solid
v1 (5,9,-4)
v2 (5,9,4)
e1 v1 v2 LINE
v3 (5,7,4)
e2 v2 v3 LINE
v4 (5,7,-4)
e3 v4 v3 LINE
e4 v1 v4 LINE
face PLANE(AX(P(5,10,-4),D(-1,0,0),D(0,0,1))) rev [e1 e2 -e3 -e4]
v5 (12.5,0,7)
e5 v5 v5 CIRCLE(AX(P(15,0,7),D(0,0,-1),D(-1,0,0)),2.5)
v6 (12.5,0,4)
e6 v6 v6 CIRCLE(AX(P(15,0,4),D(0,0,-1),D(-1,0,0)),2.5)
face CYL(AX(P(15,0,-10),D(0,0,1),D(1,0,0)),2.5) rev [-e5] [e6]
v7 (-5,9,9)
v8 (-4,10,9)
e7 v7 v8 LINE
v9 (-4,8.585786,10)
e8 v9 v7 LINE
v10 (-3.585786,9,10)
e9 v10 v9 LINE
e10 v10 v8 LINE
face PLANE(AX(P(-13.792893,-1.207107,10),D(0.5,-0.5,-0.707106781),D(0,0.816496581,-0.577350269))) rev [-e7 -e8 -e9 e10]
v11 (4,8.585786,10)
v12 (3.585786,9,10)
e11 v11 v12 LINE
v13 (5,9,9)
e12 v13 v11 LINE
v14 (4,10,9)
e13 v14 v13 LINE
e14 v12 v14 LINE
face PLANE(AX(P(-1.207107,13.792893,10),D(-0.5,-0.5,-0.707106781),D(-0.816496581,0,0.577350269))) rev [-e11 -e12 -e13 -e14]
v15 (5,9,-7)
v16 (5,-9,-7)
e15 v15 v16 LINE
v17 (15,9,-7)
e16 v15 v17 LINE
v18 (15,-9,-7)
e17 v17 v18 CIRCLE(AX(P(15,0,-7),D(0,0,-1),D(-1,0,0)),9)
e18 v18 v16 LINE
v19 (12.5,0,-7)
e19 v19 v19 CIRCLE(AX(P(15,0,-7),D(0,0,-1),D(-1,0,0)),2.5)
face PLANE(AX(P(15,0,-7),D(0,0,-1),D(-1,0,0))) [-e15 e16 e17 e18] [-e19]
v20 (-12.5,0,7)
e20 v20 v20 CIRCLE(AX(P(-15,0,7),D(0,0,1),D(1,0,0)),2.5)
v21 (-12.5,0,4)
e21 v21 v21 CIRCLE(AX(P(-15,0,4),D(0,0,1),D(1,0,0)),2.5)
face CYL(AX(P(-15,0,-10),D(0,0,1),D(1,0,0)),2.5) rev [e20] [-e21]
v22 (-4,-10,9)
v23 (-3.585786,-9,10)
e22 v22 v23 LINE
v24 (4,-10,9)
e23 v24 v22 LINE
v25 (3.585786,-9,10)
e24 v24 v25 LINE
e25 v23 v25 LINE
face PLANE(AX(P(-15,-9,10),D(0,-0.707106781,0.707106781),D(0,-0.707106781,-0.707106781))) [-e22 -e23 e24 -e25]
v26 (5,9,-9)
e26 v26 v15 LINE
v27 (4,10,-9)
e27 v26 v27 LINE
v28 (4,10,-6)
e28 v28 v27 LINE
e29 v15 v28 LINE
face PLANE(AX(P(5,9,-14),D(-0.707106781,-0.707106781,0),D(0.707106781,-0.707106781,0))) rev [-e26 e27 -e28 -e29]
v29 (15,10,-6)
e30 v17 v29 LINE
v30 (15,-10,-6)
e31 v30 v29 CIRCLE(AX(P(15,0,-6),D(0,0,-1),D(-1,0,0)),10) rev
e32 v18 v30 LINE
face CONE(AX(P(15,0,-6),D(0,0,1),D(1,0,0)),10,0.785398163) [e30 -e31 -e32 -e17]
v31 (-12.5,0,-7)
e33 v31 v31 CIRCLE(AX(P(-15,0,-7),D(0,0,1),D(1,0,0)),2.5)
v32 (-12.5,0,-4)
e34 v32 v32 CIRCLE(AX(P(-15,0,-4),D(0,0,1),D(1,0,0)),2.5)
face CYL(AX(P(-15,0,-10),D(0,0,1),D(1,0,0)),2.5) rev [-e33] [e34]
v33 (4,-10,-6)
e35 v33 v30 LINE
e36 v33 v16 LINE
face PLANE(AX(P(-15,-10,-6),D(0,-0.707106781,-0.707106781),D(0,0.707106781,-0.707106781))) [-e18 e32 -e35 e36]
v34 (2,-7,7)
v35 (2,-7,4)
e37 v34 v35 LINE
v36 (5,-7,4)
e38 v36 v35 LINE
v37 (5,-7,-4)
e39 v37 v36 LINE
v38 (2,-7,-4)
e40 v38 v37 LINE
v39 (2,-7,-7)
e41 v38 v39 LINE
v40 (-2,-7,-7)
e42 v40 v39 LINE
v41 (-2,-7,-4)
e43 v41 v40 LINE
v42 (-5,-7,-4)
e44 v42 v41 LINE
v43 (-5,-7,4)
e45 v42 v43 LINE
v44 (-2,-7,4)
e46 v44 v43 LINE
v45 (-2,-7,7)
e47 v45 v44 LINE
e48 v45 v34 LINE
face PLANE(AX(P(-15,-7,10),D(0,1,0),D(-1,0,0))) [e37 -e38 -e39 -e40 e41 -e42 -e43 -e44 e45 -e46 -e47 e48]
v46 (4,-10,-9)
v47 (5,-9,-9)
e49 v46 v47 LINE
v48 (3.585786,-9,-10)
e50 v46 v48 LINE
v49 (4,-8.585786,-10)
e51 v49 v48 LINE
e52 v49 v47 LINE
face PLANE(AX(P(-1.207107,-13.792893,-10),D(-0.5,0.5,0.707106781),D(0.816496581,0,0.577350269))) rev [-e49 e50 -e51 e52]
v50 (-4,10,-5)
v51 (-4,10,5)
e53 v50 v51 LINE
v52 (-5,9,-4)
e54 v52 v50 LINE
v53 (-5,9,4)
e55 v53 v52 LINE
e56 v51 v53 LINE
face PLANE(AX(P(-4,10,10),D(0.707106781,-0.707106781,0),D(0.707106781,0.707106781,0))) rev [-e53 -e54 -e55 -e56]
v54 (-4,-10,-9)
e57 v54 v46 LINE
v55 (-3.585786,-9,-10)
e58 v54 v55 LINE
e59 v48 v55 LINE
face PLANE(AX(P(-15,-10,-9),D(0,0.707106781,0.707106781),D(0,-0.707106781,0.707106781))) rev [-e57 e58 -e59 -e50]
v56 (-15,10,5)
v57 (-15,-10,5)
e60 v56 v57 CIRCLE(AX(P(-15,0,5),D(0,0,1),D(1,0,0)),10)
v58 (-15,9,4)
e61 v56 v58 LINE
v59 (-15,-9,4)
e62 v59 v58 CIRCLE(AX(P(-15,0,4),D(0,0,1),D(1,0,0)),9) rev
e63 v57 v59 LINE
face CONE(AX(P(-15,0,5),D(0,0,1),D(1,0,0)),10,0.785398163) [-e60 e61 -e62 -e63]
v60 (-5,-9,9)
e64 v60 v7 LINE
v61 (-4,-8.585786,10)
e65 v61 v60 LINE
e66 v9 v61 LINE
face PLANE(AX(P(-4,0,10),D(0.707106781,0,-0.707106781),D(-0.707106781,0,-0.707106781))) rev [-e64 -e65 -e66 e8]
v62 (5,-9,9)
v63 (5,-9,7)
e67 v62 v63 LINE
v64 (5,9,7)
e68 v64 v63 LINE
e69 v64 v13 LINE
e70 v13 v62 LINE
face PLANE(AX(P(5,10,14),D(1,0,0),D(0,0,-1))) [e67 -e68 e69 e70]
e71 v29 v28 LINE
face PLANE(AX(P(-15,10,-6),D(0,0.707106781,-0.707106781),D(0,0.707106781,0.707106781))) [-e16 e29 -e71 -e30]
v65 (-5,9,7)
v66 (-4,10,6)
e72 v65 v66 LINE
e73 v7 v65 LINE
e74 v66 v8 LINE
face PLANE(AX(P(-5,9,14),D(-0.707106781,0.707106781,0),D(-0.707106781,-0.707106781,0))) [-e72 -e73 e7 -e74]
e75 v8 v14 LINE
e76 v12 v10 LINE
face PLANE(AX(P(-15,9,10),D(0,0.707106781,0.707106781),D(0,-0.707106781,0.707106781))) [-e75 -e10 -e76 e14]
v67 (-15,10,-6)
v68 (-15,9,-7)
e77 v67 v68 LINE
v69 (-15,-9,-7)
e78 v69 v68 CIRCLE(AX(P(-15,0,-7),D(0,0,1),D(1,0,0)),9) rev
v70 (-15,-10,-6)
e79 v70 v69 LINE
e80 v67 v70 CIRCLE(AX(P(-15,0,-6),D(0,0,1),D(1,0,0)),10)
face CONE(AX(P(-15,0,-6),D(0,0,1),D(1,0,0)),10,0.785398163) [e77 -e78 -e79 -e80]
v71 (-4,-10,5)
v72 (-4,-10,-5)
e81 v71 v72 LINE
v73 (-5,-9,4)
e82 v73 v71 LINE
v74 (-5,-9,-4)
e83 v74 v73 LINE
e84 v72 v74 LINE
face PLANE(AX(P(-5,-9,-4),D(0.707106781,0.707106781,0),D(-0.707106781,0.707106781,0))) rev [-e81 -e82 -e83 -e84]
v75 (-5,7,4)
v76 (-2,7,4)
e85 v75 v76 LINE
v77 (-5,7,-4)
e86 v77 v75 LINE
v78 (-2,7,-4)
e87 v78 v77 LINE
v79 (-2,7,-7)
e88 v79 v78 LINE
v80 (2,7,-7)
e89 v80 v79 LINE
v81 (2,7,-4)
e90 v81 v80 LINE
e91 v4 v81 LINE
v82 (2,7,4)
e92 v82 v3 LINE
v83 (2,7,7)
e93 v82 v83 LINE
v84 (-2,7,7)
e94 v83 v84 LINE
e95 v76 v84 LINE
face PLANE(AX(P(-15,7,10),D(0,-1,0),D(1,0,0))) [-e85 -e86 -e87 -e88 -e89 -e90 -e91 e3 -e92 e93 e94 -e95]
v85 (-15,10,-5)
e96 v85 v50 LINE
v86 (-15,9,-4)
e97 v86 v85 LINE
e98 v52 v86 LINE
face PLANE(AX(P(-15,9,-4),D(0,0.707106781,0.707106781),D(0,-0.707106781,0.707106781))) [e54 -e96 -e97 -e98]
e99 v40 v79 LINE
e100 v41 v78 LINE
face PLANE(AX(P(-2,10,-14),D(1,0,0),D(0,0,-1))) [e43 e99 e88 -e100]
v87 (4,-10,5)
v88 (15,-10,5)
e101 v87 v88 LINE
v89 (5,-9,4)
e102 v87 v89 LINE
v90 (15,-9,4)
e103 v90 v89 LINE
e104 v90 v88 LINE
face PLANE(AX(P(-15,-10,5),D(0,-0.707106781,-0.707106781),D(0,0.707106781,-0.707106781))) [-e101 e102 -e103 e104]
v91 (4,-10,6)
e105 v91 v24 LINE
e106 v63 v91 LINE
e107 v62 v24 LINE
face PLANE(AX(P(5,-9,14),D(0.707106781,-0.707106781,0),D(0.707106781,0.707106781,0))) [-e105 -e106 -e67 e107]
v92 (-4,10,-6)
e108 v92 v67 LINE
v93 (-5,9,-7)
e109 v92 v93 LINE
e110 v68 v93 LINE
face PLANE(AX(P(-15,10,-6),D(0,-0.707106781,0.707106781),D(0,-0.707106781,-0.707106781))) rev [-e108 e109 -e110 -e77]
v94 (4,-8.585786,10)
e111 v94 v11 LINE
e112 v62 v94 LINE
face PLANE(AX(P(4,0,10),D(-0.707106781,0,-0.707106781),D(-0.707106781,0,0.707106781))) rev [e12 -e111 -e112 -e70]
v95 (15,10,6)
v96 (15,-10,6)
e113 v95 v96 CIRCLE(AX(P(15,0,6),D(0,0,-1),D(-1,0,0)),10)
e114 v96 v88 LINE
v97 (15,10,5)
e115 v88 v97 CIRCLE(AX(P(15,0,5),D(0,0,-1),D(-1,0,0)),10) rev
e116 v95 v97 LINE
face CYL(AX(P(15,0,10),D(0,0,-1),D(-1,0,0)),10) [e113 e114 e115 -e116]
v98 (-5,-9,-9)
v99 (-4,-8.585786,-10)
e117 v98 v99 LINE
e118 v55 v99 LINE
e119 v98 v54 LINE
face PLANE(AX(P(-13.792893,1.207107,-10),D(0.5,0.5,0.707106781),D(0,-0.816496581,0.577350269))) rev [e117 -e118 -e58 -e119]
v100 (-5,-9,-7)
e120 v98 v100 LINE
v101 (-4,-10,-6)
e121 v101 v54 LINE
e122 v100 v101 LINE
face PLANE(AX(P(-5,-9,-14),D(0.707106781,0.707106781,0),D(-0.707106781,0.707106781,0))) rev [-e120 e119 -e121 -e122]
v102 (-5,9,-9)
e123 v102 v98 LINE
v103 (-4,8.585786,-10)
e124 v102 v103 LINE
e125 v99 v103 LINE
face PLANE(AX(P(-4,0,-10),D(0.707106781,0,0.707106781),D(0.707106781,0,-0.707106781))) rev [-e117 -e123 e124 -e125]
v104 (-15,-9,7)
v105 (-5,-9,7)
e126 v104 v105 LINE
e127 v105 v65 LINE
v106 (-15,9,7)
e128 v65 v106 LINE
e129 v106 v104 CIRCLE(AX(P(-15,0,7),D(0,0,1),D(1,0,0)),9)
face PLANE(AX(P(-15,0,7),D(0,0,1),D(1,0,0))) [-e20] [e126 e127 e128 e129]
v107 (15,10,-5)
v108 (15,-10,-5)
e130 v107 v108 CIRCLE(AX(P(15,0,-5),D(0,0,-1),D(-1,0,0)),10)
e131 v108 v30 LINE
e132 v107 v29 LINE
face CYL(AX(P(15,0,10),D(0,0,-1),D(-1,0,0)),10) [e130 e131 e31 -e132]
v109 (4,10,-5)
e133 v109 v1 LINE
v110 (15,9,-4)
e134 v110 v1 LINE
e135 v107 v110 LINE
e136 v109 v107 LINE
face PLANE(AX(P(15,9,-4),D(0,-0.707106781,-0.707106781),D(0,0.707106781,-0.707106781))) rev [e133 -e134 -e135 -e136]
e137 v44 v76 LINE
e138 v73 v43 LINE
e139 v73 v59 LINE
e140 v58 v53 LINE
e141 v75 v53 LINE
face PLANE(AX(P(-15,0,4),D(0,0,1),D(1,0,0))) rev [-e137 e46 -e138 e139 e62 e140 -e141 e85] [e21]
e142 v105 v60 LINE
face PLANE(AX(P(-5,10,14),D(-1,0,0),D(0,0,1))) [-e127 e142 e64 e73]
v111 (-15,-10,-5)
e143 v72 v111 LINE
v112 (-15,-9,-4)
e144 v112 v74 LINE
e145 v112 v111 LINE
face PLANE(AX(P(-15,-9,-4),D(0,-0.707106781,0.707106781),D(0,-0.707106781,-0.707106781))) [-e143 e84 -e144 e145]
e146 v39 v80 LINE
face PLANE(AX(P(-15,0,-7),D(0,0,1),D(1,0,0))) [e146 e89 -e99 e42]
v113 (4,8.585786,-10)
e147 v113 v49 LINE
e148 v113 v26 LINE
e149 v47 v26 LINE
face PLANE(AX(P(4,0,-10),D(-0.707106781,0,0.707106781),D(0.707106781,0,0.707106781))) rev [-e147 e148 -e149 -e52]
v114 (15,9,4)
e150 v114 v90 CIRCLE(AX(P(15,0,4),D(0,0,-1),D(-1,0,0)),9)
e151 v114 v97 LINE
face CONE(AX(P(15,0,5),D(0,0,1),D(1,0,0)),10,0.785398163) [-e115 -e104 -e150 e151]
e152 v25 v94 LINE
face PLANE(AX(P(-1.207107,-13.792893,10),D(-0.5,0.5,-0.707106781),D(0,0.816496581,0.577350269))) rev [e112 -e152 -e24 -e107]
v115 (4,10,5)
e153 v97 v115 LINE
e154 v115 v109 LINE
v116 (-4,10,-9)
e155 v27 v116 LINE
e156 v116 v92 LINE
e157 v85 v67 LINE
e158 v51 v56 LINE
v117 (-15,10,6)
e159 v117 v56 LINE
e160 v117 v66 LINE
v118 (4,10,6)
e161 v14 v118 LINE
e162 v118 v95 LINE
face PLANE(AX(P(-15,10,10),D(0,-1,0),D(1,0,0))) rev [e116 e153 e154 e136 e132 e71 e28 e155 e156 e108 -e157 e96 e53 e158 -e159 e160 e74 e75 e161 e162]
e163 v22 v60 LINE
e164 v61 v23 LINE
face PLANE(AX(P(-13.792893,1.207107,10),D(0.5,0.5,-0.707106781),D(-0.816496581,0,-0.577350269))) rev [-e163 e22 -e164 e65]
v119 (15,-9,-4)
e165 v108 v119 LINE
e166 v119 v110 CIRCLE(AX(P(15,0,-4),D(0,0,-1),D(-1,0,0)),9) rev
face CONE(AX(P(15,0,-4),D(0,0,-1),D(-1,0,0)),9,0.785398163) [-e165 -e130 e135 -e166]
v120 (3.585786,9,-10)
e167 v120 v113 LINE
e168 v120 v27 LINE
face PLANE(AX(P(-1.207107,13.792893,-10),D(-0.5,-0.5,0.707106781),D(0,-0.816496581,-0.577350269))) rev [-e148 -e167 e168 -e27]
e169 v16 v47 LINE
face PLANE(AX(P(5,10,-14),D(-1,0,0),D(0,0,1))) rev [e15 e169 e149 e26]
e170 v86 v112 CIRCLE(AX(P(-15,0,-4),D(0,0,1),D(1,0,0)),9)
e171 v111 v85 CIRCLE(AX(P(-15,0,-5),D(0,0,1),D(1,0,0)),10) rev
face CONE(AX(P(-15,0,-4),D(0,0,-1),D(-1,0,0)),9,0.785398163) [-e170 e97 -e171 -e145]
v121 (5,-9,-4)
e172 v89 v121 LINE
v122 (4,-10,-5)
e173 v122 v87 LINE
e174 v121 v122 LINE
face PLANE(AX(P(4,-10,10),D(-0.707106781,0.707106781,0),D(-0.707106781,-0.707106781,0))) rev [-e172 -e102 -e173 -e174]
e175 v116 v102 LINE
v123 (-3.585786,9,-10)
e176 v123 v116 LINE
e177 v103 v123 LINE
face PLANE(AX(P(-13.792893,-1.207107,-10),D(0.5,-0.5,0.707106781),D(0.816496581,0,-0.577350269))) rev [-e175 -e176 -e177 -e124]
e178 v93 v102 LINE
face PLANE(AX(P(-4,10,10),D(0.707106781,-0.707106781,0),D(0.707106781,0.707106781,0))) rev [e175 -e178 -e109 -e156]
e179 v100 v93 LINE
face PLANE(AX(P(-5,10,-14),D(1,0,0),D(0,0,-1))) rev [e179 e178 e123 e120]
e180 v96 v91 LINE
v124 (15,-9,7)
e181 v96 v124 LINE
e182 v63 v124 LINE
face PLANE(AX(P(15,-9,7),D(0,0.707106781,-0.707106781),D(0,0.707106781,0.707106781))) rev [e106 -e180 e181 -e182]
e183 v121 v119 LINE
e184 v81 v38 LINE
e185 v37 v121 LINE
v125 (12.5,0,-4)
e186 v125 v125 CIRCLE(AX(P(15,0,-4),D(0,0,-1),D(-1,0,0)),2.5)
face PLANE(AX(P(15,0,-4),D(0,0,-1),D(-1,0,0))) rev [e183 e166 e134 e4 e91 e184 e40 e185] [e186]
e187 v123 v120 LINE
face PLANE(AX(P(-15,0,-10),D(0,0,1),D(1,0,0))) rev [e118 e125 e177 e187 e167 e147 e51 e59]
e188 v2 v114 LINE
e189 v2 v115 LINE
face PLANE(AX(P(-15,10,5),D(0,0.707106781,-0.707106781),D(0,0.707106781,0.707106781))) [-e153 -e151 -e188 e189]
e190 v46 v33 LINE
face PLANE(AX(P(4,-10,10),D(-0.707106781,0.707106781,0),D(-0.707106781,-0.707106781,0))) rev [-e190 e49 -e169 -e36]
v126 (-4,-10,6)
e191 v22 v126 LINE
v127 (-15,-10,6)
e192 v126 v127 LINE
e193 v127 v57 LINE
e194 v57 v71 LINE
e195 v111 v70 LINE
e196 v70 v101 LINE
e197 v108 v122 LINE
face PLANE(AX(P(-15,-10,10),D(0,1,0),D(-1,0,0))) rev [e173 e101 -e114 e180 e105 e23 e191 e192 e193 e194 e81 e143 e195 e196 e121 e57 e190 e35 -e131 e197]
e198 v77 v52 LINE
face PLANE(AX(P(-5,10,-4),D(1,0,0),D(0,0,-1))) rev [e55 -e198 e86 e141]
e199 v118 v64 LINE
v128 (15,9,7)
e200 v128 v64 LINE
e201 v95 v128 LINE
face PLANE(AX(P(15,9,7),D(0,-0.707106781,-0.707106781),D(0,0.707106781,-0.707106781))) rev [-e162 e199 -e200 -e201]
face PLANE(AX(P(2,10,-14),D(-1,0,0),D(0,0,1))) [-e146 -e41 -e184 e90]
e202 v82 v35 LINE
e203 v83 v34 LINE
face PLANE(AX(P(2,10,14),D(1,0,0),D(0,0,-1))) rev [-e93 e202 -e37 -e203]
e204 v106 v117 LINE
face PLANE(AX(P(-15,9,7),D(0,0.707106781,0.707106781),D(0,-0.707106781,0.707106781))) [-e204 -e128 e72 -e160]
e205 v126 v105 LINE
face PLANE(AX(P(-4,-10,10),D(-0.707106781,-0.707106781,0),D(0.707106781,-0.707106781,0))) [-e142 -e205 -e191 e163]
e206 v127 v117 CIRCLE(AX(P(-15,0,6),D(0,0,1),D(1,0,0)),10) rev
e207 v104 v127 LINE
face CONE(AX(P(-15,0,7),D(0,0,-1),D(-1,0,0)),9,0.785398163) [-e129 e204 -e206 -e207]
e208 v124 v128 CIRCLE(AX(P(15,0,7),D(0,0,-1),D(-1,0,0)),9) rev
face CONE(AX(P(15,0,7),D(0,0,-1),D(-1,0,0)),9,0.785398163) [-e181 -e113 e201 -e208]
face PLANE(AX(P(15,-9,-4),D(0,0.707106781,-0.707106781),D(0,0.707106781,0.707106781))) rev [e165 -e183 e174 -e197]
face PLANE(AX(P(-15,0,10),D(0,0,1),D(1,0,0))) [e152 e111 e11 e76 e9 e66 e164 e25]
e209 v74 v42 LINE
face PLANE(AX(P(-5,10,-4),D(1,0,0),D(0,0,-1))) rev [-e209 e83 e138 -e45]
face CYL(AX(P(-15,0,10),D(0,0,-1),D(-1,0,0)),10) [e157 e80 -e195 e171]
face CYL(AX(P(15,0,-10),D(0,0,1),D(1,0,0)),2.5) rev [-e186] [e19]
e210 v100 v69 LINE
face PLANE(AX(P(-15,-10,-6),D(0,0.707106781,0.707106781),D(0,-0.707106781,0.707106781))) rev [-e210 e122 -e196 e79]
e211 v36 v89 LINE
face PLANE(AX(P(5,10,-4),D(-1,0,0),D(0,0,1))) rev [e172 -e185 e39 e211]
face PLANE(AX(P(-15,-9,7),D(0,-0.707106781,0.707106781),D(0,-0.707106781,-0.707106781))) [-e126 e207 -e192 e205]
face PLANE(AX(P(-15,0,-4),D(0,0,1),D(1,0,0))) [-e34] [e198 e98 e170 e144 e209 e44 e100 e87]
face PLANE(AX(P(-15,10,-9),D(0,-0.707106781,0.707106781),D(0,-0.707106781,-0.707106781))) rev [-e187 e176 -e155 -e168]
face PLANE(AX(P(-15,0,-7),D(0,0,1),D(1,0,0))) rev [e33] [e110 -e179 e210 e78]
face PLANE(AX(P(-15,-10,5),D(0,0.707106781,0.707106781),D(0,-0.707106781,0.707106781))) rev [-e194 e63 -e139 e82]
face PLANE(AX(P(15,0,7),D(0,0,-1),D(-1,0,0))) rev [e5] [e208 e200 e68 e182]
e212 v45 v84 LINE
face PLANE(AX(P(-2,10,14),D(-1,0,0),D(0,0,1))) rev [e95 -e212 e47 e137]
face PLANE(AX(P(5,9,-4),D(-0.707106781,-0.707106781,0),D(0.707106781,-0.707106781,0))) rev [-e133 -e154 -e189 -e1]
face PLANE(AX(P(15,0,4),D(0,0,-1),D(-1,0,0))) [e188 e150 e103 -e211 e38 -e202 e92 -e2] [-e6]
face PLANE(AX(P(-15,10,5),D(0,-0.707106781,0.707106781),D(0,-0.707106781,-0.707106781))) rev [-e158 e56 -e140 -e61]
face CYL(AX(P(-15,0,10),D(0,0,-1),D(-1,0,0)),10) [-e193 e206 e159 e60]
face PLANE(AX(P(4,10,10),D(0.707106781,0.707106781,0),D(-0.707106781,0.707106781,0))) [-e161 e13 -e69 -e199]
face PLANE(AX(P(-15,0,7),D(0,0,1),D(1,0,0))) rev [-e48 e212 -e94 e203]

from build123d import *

# Parameters (mm, degrees)
BOSS_EXTRUDE1_DEPTH = 10
CUT_EXTRUDE1_DEPTH  = 4
CUT_EXTRUDE2_START  = -7
CUT_EXTRUDE2_DEPTH  = 7
CUT_EXTRUDE3_START  = 14
CUT_EXTRUDE3_DEPTH  = 7
SKETCH3_R           = 2.5
CUT_EXTRUDE4_DEPTH  = 10
CHAMFER2_SIZE       = 1
CHAMFER3_SIZE       = 1
CHAMFER4_SIZE       = 1
SHELL1_START        = -4
SHELL1_OUTLINE_W    = 10
SHELL1_OUTLINE_H    = 14
SHELL1_DEPTH        = 8
SHELL1_START_2      = -7
SHELL1_2_OUTLINE_W  = 4
SHELL1_2_OUTLINE_H  = 14
SHELL1_2_DEPTH      = 14
CHAMFER5_SIZE       = 1


# Read off the part's stored shape, not the designer's step: Shell1
with BuildPart() as part:
    # Sketch1 → Boss-Extrude1 (new, symmetric)
    with BuildSketch(Plane.XY):
        with BuildLine():
            Line((-15, 10), (15, 10))
            ThreePointArc((15, 10), (25, 0), (15, -10))
            Line((15, -10), (-15, -10))
            ThreePointArc((-15, -10), (-25, 0), (-15, 10))
        make_face()
    extrude(amount=BOSS_EXTRUDE1_DEPTH, both=True)

    # Sketch2 → Cut-Extrude1 (cut, symmetric)
    with BuildSketch(Plane.XY):
        with BuildLine():
            Line((-15, 10), (-5, 10))
            Line((-5, 10), (-5, -10))
            Line((-5, -10), (-15, -10))
            ThreePointArc((-15, -10), (-25, 0), (-15, 10))
        make_face()
        with BuildLine():
            Line((5, -10), (15, -10))
            ThreePointArc((15, -10), (25, 0), (15, 10))
            Line((15, 10), (5, 10))
            Line((5, 10), (5, -10))
        make_face()
    extrude(amount=CUT_EXTRUDE1_DEPTH, both=True, mode=Mode.SUBTRACT)

    # Sketch2<2> → Cut-Extrude2 (cut)
    with BuildSketch(Plane.XY.offset(CUT_EXTRUDE2_START)):
        with BuildLine():
            Line((-15, 10), (-5, 10))
            Line((-5, 10), (-5, -10))
            Line((-5, -10), (-15, -10))
            ThreePointArc((-15, -10), (-25, 0), (-15, 10))
        make_face()
        with BuildLine():
            Line((5, -10), (15, -10))
            ThreePointArc((15, -10), (25, 0), (15, 10))
            Line((15, 10), (5, 10))
            Line((5, 10), (5, -10))
        make_face()
    extrude(amount=-CUT_EXTRUDE2_DEPTH, mode=Mode.SUBTRACT)

    # Sketch2<3> → Cut-Extrude3 (cut)
    with BuildSketch(Plane.XY.offset(CUT_EXTRUDE3_START)):
        with BuildLine():
            Line((-15, 10), (-5, 10))
            Line((-5, 10), (-5, -10))
            Line((-5, -10), (-15, -10))
            ThreePointArc((-15, -10), (-25, 0), (-15, 10))
        make_face()
        with BuildLine():
            Line((5, -10), (15, -10))
            ThreePointArc((15, -10), (25, 0), (15, 10))
            Line((15, 10), (5, 10))
            Line((5, 10), (5, -10))
        make_face()
    extrude(amount=-CUT_EXTRUDE3_DEPTH, mode=Mode.SUBTRACT)

    # Sketch3 → Cut-Extrude4 (cut, symmetric)
    with BuildSketch(Plane.XY):
        with Locations((-15, 0)):
            Circle(SKETCH3_R)
        with Locations(Location((15, 0, 0), (0, 0, 180))):
            Circle(SKETCH3_R)
    extrude(amount=CUT_EXTRUDE4_DEPTH, both=True, mode=Mode.SUBTRACT)

    # Chamfer2
    chamfer2_edges = [part.edges().sort_by_distance(p)[0] for p in [
        (10, -10, 7),
        (-25, 0, -4),
        (-10, 10, -4),
        (-10, -10, -4),
        (-25, 0, 4),
        (-10, -10, 4),
        (-10, 10, 4),
        (25, 0, -4),
        (10, -10, -4),
        (10, 10, -4),
        (25, 0, 4),
        (10, 10, 4),
        (10, -10, 4),
        (-25, 0, -7),
        (-10, -10, -7),
        (-10, 10, -7),
        (25, 0, -7),
        (10, 10, -7),
        (10, -10, -7),
        (-25, 0, 7),
        (-10, -10, 7),
        (-10, 10, 7),
        (25, 0, 7),
        (10, 10, 7),
    ]]
    chamfer(chamfer2_edges, length=CHAMFER2_SIZE)

    # Chamfer3
    chamfer3_edges = [part.edges().sort_by_distance(p)[0] for p in [
        (-5, -10, -8),
        (5, -10, -8),
        (5, -10, 8),
        (-5, -10, 8),
        (-5, 10, 8),
        (5, 10, 8),
        (5, 10, -8),
        (-5, 10, -8),
    ]]
    chamfer(chamfer3_edges, length=CHAMFER3_SIZE)

    # Chamfer4
    chamfer4_edges = [part.edges().sort_by_distance(p)[0] for p in [
        (-5, 0, -10),
        (0, -10, 10),
        (0, -10, -10),
        (0, 10, -10),
        (5, 0, -10),
        (-4.5, 9.5, -10),
        (4.5, 9.5, -10),
        (4.5, -9.5, -10),
        (-4.5, -9.5, -10),
        (5, 0, 10),
        (0, 10, 10),
        (-5, 0, 10),
        (4.5, 9.5, 10),
        (-4.5, 9.5, 10),
        (-4.5, -9.5, 10),
        (4.5, -9.5, 10),
    ]]
    chamfer(chamfer4_edges, length=CHAMFER4_SIZE)

    # Shell1 outline → Shell1 (cut)
    with BuildSketch(Plane.XY.offset(SHELL1_START)):
        Rectangle(SHELL1_OUTLINE_W, SHELL1_OUTLINE_H)
    extrude(amount=SHELL1_DEPTH, mode=Mode.SUBTRACT)

    # Shell1 2 outline → Shell1 2 (cut)
    with BuildSketch(Plane.XY.offset(SHELL1_START_2)):
        Rectangle(SHELL1_2_OUTLINE_W, SHELL1_2_OUTLINE_H)
    extrude(amount=SHELL1_2_DEPTH, mode=Mode.SUBTRACT)

    # Chamfer5
    chamfer5_edges = [part.edges().sort_by_distance(p)[0] for p in [
        (5, -10, 0),
        (-5, -10, 0),
        (5, 10, 0),
        (-5, 10, 0),
    ]]
    chamfer(chamfer5_edges, length=CHAMFER5_SIZE)


solid = part.part
